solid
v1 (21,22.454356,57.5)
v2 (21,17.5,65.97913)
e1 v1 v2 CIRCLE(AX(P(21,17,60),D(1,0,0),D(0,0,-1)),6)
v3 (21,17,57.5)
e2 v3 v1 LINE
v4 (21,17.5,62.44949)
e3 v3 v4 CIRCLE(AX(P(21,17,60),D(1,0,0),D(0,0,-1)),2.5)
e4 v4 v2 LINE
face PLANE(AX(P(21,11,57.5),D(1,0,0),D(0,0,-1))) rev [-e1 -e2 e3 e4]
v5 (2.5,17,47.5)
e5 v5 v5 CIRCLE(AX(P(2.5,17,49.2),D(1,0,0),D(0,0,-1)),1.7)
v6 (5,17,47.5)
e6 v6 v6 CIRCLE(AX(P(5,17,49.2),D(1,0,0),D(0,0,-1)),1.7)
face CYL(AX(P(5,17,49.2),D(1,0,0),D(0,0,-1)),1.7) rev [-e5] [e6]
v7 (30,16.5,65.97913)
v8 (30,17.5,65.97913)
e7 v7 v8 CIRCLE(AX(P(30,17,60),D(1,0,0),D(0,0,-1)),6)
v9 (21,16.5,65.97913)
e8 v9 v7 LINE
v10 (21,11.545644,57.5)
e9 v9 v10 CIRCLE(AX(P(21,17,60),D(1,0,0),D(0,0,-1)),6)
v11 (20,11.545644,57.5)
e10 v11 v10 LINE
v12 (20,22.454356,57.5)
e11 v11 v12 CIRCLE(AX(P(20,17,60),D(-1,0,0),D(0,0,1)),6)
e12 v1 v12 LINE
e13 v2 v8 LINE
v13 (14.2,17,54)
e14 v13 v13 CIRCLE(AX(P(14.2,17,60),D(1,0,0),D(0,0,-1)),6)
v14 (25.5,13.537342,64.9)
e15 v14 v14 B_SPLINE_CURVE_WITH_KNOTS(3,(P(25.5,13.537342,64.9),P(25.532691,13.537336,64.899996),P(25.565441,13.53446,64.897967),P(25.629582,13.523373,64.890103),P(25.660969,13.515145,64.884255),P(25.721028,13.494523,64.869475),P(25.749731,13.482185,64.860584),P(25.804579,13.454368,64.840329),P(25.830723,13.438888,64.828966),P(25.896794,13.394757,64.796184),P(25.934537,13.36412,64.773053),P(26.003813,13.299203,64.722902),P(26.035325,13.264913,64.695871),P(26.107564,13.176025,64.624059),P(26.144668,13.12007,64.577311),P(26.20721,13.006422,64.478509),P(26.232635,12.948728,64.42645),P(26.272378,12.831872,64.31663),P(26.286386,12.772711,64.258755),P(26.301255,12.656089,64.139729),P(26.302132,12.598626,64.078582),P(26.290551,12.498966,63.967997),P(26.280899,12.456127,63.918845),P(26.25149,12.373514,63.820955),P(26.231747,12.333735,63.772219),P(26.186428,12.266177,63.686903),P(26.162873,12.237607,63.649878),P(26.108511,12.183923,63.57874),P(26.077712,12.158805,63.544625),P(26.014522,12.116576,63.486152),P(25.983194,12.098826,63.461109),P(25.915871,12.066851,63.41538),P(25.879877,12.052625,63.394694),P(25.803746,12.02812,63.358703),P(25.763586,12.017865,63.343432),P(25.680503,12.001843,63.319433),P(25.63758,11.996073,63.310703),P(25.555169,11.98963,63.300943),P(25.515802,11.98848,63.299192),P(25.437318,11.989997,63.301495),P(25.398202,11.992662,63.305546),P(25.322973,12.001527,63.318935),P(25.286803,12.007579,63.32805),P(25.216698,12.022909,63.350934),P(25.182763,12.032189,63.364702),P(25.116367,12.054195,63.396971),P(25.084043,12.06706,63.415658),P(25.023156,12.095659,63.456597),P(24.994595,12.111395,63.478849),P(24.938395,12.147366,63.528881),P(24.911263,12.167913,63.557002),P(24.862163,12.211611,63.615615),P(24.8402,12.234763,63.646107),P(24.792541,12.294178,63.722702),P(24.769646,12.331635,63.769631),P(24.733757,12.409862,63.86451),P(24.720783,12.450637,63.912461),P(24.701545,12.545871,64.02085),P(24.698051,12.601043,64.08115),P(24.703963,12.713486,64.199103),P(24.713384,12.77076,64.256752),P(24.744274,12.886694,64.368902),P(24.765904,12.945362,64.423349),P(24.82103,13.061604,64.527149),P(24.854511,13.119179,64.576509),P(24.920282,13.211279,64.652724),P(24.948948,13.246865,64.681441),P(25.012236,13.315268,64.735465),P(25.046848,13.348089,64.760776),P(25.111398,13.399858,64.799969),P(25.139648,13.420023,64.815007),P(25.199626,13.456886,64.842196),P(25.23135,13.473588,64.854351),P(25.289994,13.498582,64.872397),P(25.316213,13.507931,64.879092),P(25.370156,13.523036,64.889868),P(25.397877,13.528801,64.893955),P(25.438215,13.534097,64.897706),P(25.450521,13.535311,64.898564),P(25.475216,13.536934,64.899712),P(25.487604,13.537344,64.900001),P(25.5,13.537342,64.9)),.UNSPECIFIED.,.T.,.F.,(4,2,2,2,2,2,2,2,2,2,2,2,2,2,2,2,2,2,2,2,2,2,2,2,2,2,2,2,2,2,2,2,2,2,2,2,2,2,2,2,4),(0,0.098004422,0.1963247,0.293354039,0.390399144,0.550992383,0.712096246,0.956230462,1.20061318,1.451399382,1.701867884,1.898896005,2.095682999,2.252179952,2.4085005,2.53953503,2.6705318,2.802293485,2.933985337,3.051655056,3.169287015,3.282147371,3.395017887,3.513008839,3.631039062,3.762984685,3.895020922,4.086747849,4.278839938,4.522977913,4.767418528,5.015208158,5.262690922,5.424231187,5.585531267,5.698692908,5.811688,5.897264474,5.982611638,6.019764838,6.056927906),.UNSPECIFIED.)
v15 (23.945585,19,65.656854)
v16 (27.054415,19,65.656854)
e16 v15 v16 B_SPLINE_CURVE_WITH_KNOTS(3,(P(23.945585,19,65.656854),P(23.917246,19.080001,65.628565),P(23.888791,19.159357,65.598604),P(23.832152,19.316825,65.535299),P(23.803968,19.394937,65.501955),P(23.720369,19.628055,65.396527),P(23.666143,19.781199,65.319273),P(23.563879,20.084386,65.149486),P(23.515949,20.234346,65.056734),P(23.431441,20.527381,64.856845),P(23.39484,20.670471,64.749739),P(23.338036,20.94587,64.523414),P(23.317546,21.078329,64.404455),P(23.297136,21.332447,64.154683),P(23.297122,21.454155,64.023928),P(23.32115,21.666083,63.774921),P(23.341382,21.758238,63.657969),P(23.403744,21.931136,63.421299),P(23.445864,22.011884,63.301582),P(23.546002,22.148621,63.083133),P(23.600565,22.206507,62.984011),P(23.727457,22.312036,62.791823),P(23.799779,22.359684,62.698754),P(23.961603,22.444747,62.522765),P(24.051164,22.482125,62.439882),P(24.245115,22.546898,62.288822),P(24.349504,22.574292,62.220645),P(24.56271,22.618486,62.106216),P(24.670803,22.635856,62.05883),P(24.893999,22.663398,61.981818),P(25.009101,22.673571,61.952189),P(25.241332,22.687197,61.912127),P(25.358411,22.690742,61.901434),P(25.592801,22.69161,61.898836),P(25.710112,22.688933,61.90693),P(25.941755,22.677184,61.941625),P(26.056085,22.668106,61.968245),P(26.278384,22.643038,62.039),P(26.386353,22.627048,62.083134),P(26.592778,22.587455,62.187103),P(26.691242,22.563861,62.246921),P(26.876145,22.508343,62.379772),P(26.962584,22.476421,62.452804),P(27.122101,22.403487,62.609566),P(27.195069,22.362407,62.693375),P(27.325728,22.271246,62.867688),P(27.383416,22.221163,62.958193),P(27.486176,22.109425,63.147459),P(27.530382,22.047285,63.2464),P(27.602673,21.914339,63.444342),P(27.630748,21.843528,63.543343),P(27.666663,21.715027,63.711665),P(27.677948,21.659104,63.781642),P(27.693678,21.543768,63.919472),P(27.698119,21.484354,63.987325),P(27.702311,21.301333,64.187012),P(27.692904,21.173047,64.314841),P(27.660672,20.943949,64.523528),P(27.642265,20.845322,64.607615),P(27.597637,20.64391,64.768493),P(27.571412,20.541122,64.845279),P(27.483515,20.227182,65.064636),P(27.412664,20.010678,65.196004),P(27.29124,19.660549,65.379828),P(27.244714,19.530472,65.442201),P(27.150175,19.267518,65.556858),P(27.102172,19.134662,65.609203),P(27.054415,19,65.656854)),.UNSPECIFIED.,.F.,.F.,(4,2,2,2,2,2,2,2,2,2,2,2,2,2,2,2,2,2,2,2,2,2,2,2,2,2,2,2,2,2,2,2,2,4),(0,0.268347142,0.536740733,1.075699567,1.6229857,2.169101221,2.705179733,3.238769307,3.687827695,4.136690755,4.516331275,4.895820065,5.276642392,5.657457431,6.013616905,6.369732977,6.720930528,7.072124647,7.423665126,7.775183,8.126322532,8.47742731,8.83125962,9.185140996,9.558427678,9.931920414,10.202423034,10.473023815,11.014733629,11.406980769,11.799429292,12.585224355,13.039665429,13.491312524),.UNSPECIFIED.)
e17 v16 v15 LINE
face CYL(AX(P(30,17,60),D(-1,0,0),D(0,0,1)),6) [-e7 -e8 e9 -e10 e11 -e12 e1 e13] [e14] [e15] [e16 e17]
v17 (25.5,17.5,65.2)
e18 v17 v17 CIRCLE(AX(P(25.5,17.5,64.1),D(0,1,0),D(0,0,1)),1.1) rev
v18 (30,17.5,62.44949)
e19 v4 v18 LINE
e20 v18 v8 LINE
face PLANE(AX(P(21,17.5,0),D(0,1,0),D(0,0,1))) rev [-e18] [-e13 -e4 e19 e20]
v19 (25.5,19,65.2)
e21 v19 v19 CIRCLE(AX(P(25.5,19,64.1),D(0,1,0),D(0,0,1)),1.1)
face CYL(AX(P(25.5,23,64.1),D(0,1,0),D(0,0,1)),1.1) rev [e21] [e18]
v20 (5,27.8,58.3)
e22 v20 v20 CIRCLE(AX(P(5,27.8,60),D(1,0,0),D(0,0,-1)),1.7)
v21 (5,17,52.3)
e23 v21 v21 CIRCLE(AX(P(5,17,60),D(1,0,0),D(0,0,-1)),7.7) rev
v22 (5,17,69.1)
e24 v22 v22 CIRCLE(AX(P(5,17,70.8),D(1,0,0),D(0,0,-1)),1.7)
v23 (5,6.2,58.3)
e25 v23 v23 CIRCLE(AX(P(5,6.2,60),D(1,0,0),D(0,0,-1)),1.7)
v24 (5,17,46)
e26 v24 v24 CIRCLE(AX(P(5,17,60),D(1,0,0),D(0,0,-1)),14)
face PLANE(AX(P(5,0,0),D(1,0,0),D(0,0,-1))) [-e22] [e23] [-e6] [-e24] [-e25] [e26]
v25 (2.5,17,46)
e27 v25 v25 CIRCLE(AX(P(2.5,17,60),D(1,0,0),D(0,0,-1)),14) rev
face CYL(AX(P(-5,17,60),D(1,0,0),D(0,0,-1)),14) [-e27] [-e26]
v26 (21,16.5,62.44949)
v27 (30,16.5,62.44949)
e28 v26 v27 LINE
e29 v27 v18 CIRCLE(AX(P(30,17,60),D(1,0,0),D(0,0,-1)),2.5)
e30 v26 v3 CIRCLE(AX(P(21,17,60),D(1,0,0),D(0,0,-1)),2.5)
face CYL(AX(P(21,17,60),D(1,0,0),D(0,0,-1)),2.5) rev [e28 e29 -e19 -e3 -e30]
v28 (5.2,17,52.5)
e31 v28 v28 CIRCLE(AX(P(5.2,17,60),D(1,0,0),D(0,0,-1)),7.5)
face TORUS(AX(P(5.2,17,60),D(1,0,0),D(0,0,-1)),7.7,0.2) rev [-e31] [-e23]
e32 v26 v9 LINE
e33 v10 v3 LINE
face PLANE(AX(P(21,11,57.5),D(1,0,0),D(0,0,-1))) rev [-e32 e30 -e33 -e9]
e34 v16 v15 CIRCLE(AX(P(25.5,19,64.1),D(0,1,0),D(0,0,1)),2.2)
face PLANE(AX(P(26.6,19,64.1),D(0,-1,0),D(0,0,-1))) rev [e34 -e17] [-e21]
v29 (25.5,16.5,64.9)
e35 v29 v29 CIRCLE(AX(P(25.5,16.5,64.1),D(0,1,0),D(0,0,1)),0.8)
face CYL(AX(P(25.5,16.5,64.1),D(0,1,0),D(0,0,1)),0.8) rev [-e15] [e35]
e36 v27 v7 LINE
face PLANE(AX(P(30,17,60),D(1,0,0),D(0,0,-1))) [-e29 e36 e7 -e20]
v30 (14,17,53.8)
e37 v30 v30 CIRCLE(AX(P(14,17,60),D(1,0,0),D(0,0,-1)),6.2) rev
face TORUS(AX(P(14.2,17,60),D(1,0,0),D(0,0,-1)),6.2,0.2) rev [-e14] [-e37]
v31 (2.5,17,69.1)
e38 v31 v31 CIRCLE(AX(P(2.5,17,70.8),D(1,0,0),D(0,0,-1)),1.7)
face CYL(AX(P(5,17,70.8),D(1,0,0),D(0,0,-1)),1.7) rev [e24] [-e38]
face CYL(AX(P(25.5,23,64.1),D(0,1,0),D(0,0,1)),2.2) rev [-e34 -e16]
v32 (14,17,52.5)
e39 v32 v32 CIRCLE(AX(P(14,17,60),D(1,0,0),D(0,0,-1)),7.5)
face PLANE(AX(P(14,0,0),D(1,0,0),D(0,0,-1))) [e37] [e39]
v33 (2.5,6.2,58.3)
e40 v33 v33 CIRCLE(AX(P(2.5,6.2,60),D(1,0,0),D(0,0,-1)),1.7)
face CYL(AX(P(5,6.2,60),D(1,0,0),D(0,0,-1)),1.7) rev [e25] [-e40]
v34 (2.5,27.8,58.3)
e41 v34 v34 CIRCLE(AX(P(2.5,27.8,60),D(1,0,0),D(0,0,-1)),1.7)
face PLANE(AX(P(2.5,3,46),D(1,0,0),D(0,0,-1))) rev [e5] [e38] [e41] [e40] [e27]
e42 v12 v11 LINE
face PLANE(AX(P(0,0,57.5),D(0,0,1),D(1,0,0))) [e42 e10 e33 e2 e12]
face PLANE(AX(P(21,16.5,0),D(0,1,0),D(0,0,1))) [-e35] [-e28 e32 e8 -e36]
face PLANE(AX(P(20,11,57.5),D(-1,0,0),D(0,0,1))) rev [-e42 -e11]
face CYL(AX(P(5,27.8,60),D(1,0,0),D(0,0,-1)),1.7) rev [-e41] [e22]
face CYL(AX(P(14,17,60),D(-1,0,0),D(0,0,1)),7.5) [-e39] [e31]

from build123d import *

# Parameters (mm, degrees)
SKETCH1_W                                     = 120
SKETCH1_H                                     = 34
BOSS_EXTRUDE1_DEPTH                           = 5
BOSS_EXTRUDE2_DEPTH                           = 9
SKETCH3_R                                     = 6
BOSS_EXTRUDE3_DEPTH                           = 16
CUT_EXTRUDE1_DEPTH                            = 9
SKETCH5_W                                     = 1
SKETCH5_H                                     = 12
CUT_EXTRUDE2_DEPTH                            = 8.5
CBORE_START                                   = 19
CBORE_FOR_M2_HEX_SOCKET_HEAD_CAP_SCREW1_DEPTH = 3.691221609
CBORE_START_2                                 = 17.5
CBORE_FOR_M2_HEX_SOCKET_HEAD_CAP_SCR_3_O_R    = 1.1
CBORE_FOR_M2_HEX_SOCKET_HEAD_CAP_SCR_3_DEPTH  = 1.5
M2_TAPPED_HOLE1_D                             = 1.6
FILLET1_R                                     = 0.2
SKETCH12_W                                    = 120
SKETCH12_H                                    = 34
SKETCH12_R                                    = 14
CUT_EXTRUDE3_DEPTH                            = 10
CUT_EXTRUDE4_DEPTH                            = 83.316462545
CUT_EXTRUDE4_DEPTH_BACK                       = 83.316462545
SKETCH13_W                                    = 2.5
SKETCH13_H                                    = 28
M3_CLEARANCE_HOLE1_D                          = 3.4
M3_CLEARANCE_HOLE1_DEPTH                      = 15
M3_CLEARANCE_HOLE1_TIP                        = 1.021463052


# Read off the part's stored shape, not the designer's step: CBORE for M2 Hex Socket Head Cap Screw1
with BuildPart() as part:
    # Sketch1 → Boss-Extrude1 (new body)
    with BuildSketch(Plane(origin=(0, 0, 0), x_dir=(0, 0, -1), z_dir=(1, 0, 0))):
        with Locations((-60, 17)):
            Rectangle(SKETCH1_W, SKETCH1_H)
    extrude(amount=BOSS_EXTRUDE1_DEPTH)

    # Sketch2 → Boss-Extrude2 (add)
    with BuildSketch(Plane(origin=(5, 0, 0), x_dir=(0, 0, -1), z_dir=(1, 0, 0))):
        with BuildLine():
            ThreePointArc((-52.5, 17), (-54.696699141, 22.303300859), (-60, 24.5))
            Line((-60, 24.5), (-60, 9.5))
            ThreePointArc((-60, 9.5), (-54.696699141, 11.696699141), (-52.5, 17))
        make_face()
        with BuildLine():
            Line((-60, 9.5), (-60, 24.5))
            ThreePointArc((-60, 24.5), (-67.5, 17), (-60, 9.5))
        make_face()
    extrude(amount=BOSS_EXTRUDE2_DEPTH)

    # Sketch3 → Boss-Extrude3 (add)
    with BuildSketch(Plane(origin=(14, 0, 0), x_dir=(0, 0, -1), z_dir=(1, 0, 0))):
        with Locations((-60, 17)):
            Circle(SKETCH3_R)
    extrude(amount=BOSS_EXTRUDE3_DEPTH)

    # Sketch4 → Cut-Extrude1 (cut)
    with BuildSketch(Plane(origin=(30, 0, 0), x_dir=(0, 0, -1), z_dir=(1, 0, 0))):
        with BuildLine():
            Line((-62.449489743, 17.5), (-67.449489743, 17.5))
            Line((-67.449489743, 17.5), (-67.449489743, 16.5))
            Line((-67.449489743, 16.5), (-62.449489743, 16.5))
            ThreePointArc((-62.449489743, 16.5), (-57.5, 17), (-62.449489743, 17.5))
        make_face()
    extrude(amount=-CUT_EXTRUDE1_DEPTH, mode=Mode.SUBTRACT)

    # Sketch5 → Cut-Extrude2 (cut)
    with BuildSketch(Plane.XY.offset(66)):
        with Locations((20.5, 17)):
            Rectangle(SKETCH5_W, SKETCH5_H)
    extrude(amount=-CUT_EXTRUDE2_DEPTH, mode=Mode.SUBTRACT)

    # CBORE for M2 Hex Socket Head Cap Scr 2 → CBORE for M2 Hex Socket Head Cap Screw1 (cut)
    with BuildSketch(Plane(origin=(0, 0, 0), x_dir=(1, 0, 0), z_dir=(0, 1, 0)).offset(CBORE_START)):
        with BuildLine():
            Line((25.709160843, -67), (27.054414631, -65.656854249))
            ThreePointArc((27.054414631, -65.656854249), (25.5, -61.9), (23.945585369, -65.656854249))
            Line((23.945585369, -65.656854249), (25.290839157, -67))
            Line((25.290839157, -67), (25.709160843, -67))
        make_face()
    extrude(amount=CBORE_FOR_M2_HEX_SOCKET_HEAD_CAP_SCREW1_DEPTH, mode=Mode.SUBTRACT)

    # CBORE for M2 Hex Socket Head Cap Scr 3 o → CBORE for M2 Hex Socket Head Cap Scr 3 (cut)
    with BuildSketch(Plane(origin=(0, 0, 0), x_dir=(1, 0, 0), z_dir=(0, 1, 0)).offset(CBORE_START_2)):
        with Locations((25.5, -64.1)):
            Circle(CBORE_FOR_M2_HEX_SOCKET_HEAD_CAP_SCR_3_O_R)
    extrude(amount=CBORE_FOR_M2_HEX_SOCKET_HEAD_CAP_SCR_3_DEPTH, mode=Mode.SUBTRACT)

    # M2 Tapped Hole1 (through all)
    with Locations(Plane(origin=(0, 16.5, 0), x_dir=(1, 0, 0), z_dir=(0, 1, 0))):
        with Locations((25.5, -64.1)):
            Hole(M2_TAPPED_HOLE1_D / 2)

    # Fillet1
    fillet1_edges = [part.edges().sort_by_distance(p)[0] for p in [
        (5, 24.5, 60),
        (14, 17, 66),
    ]]
    fillet(fillet1_edges, radius=FILLET1_R)

    # Sketch12 → Cut-Extrude3 (cut)
    with BuildSketch(Plane(origin=(5, 0, 0), x_dir=(0, 0, -1), z_dir=(1, 0, 0))):
        with Locations((-60, 17)):
            Rectangle(SKETCH12_W, SKETCH12_H)
        with Locations((-60, 17)):
            Circle(SKETCH12_R, mode=Mode.SUBTRACT)
    extrude(amount=-CUT_EXTRUDE3_DEPTH, mode=Mode.SUBTRACT)

    # Sketch13 → Cut-Extrude4 (cut, two sides: drawn at the far end of the back side and taken through both)
    with BuildSketch(Plane(origin=(0, 23, 0), x_dir=(1, 0, 0), z_dir=(0, 1, 0)).offset(-CUT_EXTRUDE4_DEPTH_BACK)):
        with Locations((1.25, -60)):
            Rectangle(SKETCH13_W, SKETCH13_H)
    extrude(amount=CUT_EXTRUDE4_DEPTH + CUT_EXTRUDE4_DEPTH_BACK, mode=Mode.SUBTRACT)

    # M3 Clearance Hole1
    with Locations(Plane(origin=(5, 0, 0), x_dir=(0, 0, -1), z_dir=(1, 0, 0))):
        with Locations((-60, 27.8), (-49.2, 17), (-60, 6.2), (-70.8, 17)):
            Hole(M3_CLEARANCE_HOLE1_D / 2, depth=M3_CLEARANCE_HOLE1_DEPTH)
            with Locations((0, 0, -(M3_CLEARANCE_HOLE1_DEPTH + M3_CLEARANCE_HOLE1_TIP / 2))):  # 118° drill point
                Cone(0, M3_CLEARANCE_HOLE1_D / 2, M3_CLEARANCE_HOLE1_TIP, mode=Mode.SUBTRACT)


solid = part.part
